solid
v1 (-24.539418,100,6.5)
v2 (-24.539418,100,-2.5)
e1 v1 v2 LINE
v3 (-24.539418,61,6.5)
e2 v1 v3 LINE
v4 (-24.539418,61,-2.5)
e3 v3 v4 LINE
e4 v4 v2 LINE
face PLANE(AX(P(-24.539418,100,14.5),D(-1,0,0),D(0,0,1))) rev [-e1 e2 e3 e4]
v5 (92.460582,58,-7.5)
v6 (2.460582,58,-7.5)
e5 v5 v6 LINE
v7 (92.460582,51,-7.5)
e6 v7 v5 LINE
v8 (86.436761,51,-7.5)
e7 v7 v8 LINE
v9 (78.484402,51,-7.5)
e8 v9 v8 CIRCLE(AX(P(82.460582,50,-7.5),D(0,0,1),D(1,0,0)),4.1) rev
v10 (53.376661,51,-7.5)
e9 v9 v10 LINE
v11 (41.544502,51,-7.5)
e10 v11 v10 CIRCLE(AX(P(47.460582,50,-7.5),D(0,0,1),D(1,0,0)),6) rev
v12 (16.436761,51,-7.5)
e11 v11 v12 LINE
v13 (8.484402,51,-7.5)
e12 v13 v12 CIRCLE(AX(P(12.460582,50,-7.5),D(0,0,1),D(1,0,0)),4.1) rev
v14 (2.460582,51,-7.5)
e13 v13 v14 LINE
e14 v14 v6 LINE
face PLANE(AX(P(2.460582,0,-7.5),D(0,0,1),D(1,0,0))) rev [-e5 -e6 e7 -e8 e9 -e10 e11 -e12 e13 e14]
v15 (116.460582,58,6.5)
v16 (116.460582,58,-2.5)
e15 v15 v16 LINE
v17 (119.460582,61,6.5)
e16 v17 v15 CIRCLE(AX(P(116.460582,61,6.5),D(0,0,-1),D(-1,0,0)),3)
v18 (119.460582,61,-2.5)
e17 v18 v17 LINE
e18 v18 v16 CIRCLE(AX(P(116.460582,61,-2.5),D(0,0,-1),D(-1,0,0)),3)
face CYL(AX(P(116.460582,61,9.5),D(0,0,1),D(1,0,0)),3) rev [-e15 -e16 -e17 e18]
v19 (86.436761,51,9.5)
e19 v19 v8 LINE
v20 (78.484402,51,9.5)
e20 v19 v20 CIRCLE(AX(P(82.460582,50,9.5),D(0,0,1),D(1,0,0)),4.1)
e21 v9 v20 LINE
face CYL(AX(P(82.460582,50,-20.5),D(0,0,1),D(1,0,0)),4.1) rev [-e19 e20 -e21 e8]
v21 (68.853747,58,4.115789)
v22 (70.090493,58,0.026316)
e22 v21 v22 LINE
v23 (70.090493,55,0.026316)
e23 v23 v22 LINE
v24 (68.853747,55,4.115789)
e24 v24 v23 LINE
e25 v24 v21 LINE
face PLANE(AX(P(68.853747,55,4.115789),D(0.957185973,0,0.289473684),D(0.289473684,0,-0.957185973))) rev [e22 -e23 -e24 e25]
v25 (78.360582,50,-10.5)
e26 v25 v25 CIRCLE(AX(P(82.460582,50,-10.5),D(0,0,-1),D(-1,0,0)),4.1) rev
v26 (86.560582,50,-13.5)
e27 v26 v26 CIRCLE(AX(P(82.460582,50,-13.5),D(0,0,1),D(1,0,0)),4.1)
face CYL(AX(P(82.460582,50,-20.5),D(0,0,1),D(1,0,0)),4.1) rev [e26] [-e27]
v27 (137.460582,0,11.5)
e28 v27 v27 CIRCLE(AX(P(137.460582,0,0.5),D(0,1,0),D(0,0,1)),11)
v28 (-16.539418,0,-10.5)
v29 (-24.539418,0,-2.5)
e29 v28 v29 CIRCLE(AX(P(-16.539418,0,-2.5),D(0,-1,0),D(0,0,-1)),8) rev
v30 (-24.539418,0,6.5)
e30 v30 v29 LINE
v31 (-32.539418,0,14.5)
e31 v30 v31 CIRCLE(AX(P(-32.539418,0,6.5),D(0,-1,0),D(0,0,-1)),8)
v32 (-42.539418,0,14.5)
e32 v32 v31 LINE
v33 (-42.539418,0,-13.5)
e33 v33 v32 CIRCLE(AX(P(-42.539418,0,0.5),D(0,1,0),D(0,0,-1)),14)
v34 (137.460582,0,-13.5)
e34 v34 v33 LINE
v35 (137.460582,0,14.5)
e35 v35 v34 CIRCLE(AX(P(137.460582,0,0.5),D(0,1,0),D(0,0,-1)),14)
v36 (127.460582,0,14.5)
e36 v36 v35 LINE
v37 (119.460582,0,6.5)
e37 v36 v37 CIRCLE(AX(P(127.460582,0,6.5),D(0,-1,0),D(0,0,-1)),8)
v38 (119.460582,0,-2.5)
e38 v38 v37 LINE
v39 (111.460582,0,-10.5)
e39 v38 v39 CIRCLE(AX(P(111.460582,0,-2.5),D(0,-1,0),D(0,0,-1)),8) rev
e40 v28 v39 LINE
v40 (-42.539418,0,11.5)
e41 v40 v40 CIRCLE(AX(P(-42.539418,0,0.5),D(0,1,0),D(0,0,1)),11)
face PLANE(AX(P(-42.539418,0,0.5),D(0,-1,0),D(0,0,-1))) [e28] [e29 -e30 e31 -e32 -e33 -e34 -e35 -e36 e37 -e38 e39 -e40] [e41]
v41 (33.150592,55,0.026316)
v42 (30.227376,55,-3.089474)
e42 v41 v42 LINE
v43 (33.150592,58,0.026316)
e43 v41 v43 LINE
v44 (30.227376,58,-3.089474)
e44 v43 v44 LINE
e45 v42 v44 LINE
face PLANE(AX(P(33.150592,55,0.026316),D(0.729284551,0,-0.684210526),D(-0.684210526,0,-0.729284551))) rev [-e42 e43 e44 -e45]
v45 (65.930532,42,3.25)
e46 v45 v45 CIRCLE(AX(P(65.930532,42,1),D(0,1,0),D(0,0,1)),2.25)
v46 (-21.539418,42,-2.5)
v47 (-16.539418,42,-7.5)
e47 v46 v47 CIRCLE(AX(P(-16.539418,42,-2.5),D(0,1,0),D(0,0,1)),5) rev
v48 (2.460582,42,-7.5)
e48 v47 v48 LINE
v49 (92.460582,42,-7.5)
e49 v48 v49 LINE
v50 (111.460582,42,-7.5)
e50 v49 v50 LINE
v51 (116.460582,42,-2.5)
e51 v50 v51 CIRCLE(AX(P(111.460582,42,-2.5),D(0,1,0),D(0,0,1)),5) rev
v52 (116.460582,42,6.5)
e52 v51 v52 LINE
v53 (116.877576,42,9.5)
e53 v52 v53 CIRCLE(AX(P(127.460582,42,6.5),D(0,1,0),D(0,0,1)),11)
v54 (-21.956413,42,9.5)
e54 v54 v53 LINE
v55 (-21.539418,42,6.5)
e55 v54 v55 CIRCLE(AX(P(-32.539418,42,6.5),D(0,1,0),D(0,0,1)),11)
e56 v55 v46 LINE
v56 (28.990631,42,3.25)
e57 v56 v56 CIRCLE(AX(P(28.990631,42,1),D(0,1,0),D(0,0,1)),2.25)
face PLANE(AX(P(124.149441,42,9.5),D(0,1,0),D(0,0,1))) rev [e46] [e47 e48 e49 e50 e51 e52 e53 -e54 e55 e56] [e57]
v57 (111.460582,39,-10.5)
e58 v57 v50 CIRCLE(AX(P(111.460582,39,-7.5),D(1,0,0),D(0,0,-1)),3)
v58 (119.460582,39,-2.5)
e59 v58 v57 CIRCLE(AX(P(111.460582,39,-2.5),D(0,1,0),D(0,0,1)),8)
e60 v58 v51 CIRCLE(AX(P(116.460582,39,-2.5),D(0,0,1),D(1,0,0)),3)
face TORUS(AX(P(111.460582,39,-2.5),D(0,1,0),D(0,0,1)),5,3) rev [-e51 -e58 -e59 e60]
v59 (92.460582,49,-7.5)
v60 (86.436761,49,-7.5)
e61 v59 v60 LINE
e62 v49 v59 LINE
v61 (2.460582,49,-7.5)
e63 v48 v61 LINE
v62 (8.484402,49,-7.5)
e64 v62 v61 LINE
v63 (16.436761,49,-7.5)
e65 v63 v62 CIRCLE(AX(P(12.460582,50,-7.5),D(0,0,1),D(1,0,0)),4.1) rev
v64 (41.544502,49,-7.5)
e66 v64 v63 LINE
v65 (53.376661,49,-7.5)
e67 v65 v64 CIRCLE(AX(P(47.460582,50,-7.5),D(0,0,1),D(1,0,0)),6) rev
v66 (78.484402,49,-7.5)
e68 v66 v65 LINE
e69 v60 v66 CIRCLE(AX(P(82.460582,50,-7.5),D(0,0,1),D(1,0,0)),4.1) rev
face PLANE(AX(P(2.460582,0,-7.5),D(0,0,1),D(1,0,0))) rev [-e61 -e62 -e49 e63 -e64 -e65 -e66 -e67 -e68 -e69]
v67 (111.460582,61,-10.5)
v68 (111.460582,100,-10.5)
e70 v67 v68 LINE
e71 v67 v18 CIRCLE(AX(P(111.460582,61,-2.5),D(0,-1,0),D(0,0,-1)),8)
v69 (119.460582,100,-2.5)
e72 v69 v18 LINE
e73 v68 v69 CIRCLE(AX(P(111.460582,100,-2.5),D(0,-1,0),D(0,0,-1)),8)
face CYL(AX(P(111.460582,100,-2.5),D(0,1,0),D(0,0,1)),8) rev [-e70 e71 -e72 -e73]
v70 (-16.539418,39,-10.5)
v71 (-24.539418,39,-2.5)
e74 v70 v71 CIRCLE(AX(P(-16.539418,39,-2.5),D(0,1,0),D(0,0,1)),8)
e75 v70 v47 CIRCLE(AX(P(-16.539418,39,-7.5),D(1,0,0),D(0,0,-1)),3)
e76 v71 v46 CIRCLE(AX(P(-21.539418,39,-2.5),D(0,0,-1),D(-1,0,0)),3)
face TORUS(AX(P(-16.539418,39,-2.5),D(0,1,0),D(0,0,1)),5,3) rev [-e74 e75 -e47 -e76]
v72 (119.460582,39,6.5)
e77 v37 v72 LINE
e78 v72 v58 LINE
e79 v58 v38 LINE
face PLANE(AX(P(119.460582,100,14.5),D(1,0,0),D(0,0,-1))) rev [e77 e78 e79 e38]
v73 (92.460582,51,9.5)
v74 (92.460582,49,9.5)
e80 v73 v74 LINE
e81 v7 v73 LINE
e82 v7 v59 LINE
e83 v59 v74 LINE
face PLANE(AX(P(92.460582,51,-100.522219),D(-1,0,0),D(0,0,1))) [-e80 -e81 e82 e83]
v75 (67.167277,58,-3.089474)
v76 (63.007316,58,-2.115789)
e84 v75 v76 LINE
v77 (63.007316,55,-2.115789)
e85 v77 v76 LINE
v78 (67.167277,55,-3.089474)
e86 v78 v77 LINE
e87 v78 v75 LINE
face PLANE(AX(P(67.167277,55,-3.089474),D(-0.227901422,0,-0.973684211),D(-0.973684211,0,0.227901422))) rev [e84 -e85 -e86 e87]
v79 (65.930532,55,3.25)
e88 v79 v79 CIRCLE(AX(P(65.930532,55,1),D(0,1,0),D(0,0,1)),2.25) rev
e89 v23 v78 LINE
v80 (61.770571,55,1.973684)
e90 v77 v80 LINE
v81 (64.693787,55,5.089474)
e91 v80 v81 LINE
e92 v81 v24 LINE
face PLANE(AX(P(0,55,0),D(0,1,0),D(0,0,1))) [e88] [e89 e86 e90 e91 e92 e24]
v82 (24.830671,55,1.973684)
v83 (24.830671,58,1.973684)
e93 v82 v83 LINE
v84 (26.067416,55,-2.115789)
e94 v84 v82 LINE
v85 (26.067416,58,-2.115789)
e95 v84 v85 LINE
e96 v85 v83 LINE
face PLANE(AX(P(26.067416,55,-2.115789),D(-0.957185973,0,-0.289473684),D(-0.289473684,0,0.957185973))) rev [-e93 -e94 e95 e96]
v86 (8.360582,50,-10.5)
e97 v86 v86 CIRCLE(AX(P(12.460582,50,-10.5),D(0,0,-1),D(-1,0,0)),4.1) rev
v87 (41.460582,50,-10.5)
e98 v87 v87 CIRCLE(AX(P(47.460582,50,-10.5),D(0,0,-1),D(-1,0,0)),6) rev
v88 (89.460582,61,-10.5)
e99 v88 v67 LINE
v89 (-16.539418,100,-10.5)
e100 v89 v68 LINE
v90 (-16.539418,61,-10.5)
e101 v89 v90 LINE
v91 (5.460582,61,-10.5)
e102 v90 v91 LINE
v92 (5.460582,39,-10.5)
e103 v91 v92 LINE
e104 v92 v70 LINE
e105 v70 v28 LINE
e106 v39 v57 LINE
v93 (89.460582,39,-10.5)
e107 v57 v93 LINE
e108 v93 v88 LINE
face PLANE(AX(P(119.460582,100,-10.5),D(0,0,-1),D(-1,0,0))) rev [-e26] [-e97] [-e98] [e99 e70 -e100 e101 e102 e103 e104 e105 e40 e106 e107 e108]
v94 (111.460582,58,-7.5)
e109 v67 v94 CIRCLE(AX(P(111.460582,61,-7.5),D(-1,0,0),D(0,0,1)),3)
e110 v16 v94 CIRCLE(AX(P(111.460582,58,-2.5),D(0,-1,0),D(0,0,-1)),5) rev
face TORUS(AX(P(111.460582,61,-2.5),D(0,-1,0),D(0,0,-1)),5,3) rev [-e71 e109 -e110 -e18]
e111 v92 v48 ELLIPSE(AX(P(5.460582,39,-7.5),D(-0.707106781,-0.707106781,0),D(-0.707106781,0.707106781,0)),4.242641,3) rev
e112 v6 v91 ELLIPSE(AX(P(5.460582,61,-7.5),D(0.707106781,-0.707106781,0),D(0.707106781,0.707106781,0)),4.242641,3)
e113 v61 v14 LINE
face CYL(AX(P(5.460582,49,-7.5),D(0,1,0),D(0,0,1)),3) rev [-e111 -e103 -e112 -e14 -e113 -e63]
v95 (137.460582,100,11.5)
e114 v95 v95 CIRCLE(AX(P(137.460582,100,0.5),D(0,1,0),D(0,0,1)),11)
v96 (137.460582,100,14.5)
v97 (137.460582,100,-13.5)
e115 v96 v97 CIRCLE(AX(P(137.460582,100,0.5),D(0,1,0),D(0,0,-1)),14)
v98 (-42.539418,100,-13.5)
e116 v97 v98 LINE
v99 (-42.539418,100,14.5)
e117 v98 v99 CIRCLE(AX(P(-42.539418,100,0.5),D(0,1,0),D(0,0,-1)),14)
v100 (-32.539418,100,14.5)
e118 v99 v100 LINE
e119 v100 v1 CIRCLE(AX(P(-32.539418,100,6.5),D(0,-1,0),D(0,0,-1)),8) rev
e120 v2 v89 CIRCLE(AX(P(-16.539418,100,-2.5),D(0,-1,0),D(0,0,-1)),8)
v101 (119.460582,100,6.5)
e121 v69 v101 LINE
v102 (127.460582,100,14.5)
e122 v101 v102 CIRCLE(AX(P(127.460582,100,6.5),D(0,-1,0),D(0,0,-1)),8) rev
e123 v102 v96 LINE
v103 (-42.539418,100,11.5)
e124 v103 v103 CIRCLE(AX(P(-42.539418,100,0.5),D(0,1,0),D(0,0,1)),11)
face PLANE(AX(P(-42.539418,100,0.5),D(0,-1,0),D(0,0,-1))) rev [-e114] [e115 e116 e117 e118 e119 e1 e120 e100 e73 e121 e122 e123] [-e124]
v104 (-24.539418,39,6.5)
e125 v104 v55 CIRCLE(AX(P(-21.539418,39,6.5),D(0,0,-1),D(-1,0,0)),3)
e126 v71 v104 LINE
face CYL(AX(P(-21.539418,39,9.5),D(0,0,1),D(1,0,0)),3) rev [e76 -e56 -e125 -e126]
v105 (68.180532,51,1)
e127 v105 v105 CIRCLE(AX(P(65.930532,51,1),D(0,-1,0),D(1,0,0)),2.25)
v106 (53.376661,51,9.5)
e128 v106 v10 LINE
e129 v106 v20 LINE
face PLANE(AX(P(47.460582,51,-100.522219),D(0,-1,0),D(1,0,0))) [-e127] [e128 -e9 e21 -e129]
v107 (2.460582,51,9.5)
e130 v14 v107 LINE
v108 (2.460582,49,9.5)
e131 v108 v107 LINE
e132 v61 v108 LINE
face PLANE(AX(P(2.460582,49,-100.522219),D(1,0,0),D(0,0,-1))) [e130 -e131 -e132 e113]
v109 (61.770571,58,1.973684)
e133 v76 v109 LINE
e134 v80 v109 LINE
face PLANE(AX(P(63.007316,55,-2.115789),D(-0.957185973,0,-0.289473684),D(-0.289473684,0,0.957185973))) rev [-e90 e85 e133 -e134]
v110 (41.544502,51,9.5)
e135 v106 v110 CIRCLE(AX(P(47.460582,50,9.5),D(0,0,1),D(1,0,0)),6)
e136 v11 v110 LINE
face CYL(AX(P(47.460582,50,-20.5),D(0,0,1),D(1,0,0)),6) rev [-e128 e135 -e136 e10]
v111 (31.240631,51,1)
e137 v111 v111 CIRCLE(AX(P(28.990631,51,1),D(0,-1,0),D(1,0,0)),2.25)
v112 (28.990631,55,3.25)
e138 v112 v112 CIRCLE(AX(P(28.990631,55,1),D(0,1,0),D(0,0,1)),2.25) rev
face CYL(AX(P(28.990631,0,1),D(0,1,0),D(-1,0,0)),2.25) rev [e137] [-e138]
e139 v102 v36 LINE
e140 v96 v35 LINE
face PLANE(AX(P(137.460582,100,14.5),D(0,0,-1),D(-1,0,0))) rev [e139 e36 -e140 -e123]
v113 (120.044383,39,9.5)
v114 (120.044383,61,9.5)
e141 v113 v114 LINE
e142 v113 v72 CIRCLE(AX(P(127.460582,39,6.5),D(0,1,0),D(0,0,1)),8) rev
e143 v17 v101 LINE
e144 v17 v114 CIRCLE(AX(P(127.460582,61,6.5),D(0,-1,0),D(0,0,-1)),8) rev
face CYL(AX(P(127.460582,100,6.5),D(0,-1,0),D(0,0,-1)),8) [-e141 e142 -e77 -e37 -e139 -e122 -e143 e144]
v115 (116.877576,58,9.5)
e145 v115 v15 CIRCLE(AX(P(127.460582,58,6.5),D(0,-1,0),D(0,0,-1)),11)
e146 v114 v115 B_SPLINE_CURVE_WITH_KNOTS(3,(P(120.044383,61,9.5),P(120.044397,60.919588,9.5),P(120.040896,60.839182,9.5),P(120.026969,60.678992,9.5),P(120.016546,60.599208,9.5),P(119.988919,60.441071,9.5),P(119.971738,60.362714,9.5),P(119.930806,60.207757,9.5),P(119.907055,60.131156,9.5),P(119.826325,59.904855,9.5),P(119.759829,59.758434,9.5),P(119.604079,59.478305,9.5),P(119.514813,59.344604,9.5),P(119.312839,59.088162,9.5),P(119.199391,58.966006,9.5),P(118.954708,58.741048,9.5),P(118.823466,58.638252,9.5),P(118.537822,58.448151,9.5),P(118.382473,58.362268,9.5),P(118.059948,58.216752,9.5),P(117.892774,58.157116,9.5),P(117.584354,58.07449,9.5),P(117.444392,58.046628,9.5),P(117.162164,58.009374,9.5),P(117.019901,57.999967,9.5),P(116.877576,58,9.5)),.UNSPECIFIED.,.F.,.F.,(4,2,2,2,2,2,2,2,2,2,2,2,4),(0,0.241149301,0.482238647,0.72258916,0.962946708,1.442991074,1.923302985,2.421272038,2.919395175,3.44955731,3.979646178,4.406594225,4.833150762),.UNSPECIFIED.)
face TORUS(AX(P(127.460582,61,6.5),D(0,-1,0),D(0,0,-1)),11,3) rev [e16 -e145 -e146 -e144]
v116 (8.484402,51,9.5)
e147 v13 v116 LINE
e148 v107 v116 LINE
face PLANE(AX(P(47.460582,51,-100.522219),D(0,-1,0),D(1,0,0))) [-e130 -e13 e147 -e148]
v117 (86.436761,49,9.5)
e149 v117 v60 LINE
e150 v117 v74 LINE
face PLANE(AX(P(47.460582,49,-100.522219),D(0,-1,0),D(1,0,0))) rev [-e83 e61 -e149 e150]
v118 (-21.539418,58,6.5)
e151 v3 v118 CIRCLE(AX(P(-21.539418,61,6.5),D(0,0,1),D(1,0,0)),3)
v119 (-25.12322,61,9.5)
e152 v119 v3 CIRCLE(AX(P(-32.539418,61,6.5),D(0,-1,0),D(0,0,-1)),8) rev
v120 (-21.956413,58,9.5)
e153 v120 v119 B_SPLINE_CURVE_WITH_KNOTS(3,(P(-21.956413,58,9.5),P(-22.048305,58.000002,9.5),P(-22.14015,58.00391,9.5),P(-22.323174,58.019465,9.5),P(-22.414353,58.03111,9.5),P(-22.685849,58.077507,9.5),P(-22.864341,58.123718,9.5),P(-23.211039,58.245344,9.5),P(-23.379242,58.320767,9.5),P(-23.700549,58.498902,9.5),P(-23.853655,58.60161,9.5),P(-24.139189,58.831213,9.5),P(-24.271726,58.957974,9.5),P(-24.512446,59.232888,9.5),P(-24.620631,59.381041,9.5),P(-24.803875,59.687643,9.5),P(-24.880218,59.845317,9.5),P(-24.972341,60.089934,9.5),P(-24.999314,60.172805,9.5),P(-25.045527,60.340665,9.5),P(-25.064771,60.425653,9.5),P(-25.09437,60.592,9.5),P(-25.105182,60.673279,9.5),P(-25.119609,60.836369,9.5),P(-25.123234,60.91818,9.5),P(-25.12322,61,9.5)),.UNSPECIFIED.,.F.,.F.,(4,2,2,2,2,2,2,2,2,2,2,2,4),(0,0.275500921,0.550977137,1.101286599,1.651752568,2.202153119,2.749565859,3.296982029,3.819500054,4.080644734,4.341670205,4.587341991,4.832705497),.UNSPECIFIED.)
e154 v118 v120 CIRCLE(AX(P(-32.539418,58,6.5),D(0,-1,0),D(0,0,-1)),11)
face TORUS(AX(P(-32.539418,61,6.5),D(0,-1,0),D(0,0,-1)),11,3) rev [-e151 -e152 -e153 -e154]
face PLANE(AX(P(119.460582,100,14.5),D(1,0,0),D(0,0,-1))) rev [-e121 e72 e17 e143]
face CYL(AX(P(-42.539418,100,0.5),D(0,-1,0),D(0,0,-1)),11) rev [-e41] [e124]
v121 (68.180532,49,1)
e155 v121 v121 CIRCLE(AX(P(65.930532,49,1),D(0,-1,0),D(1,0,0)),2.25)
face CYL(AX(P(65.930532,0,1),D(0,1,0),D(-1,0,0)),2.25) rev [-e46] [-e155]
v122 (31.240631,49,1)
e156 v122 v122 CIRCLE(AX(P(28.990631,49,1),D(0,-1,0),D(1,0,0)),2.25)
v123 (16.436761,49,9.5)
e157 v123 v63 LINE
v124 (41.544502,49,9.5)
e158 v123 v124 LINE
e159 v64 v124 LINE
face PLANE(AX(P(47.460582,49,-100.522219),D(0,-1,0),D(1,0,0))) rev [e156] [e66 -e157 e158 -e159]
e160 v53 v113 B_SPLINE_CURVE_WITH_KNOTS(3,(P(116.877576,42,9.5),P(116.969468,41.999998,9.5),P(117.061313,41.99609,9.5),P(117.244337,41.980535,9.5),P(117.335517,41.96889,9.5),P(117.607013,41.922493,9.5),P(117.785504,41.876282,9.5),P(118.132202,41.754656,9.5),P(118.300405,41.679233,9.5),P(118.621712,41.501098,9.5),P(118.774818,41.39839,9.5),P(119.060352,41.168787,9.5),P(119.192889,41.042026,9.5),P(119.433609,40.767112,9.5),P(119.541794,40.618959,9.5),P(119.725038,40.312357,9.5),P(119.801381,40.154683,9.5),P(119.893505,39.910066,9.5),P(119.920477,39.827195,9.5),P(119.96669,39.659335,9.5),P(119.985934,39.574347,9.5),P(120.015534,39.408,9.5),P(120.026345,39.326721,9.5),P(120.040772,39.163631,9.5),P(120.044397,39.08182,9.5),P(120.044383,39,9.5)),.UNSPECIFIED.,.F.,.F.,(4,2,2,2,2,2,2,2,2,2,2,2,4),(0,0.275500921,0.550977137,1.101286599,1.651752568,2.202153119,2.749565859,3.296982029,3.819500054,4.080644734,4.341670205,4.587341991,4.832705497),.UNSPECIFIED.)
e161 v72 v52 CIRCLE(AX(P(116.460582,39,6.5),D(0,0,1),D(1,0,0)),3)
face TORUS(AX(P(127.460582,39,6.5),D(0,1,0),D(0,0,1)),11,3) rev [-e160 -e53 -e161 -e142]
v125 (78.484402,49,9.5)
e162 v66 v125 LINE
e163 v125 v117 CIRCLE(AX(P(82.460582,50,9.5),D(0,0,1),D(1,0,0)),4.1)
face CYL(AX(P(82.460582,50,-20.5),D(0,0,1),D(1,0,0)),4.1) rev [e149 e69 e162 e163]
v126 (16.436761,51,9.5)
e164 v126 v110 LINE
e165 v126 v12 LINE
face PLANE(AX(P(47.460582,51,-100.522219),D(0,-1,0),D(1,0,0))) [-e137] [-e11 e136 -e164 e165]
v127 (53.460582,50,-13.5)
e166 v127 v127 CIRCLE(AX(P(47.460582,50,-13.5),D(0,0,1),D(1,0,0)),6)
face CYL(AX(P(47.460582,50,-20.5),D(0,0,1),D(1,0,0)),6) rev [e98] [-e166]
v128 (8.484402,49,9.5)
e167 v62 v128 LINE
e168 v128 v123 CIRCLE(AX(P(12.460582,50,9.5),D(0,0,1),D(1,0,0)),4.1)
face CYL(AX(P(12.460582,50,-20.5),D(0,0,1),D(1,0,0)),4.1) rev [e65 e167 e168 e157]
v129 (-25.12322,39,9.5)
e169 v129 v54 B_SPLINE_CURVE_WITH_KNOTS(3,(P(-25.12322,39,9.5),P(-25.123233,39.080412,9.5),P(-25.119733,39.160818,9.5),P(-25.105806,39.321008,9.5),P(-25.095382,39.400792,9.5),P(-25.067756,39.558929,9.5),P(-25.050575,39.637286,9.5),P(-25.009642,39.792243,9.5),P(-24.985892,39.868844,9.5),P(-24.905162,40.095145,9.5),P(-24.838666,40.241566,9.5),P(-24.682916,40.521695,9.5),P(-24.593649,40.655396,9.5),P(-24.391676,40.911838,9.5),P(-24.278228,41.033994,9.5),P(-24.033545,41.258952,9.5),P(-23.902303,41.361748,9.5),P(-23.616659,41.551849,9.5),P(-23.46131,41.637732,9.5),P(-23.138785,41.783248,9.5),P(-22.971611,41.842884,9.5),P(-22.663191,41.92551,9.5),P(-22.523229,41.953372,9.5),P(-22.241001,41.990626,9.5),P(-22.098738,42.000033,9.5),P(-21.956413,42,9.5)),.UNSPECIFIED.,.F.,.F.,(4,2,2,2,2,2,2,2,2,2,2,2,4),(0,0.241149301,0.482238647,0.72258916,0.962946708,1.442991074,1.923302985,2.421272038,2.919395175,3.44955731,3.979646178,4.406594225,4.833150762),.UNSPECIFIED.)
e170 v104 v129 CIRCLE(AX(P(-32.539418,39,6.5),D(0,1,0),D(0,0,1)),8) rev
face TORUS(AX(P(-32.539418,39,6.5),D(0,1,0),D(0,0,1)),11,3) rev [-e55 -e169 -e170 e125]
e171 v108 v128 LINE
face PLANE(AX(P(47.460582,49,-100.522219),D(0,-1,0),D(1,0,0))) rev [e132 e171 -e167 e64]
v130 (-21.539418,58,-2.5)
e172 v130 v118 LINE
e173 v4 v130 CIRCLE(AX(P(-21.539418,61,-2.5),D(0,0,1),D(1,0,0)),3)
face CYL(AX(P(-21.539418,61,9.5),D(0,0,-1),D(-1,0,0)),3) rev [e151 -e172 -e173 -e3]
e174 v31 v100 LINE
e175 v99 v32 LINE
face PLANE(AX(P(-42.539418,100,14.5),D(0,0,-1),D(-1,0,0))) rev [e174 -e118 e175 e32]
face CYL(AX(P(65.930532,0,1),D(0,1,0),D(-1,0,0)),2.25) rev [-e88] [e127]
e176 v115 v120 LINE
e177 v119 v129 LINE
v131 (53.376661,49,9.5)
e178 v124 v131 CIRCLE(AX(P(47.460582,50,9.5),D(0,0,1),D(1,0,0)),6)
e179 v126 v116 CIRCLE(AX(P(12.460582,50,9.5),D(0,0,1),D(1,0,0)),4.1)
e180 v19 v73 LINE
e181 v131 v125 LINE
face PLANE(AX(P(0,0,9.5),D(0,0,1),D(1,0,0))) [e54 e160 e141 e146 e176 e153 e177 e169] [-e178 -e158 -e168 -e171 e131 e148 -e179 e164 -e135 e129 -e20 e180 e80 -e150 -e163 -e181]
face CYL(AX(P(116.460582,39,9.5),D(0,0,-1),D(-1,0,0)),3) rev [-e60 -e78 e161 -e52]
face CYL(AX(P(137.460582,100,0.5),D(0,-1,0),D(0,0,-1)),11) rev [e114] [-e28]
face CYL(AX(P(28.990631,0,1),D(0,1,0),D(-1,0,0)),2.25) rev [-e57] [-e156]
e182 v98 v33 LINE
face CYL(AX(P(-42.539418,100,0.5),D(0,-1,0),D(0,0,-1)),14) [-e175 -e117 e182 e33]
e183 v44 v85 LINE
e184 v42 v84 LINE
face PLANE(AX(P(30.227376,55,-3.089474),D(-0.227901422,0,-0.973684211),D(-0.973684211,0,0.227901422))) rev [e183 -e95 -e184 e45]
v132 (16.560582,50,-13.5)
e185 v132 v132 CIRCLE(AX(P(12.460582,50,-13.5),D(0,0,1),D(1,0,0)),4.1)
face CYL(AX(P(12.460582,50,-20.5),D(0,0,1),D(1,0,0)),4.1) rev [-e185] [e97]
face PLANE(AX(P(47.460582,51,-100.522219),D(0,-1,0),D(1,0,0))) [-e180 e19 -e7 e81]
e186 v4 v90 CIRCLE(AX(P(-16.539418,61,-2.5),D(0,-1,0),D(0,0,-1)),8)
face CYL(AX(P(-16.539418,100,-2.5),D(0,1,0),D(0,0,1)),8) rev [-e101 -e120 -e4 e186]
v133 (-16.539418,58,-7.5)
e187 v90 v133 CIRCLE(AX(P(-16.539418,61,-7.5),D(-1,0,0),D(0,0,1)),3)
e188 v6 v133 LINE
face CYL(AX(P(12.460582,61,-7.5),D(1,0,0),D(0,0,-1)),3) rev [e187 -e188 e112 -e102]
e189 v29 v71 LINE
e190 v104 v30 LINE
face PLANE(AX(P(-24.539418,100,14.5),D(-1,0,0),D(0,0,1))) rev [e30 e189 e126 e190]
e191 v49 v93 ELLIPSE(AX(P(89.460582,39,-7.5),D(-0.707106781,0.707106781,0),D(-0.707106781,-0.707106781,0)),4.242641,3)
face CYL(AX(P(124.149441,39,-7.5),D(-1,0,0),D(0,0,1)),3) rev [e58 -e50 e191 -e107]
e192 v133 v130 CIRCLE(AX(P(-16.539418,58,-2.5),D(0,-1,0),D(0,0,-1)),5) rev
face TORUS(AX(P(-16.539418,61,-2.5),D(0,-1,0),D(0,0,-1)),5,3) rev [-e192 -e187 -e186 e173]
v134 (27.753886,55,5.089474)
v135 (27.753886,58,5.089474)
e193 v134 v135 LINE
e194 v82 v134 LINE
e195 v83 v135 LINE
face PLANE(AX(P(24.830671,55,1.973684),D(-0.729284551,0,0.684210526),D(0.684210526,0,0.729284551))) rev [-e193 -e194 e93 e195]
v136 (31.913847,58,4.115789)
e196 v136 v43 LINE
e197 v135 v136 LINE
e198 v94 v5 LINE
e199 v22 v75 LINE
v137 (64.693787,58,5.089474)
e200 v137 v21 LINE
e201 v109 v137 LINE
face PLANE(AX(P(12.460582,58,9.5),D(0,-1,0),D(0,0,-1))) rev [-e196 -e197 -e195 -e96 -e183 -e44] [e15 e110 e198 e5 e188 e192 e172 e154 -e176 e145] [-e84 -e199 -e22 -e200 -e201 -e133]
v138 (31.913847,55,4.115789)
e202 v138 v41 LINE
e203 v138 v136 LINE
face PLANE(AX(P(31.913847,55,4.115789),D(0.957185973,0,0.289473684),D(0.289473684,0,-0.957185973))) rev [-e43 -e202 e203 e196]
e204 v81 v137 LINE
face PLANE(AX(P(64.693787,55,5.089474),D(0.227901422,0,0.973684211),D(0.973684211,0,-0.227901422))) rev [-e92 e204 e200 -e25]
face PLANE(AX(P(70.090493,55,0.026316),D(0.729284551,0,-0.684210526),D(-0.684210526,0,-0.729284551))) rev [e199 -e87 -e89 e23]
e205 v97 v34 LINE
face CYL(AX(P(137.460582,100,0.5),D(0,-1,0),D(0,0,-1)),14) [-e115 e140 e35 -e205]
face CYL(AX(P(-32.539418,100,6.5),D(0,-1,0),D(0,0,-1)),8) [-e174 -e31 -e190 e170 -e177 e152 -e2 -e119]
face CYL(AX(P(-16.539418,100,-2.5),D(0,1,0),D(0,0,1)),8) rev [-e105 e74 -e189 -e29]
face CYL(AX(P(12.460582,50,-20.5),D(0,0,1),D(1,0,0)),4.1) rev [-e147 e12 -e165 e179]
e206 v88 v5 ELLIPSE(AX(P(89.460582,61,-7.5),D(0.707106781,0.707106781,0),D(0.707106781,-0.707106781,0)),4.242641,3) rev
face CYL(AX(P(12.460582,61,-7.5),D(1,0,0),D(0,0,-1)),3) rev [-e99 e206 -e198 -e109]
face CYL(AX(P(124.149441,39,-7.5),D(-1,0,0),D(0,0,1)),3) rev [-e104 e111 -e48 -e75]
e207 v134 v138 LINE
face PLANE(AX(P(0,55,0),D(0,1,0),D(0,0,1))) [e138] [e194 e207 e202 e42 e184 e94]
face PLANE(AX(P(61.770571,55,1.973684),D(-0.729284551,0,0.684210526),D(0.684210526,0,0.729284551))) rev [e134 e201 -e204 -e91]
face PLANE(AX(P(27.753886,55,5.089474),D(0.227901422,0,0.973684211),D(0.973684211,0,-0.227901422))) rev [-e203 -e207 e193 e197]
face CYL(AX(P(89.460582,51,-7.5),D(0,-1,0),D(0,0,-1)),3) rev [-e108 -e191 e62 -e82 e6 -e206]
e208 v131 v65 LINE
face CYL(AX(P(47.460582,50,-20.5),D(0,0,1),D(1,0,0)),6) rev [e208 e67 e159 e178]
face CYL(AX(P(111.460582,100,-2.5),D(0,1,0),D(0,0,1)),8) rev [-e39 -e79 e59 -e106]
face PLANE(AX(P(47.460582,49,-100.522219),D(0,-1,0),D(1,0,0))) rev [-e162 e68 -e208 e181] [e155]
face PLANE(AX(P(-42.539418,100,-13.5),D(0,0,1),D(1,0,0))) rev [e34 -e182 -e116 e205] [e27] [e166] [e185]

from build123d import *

# Parameters (mm, degrees)
SKETCH1_R                    = 11
BOSS_EXTRUDE1_DEPTH          = 100
FILLET1_R                    = 8
SKETCH2_R                    = 4.1
SKETCH2_R_2                  = 6
CUT_EXTRUDE1_DEPTH           = 10
BOSS_EXTRUDE2_START          = 20
SKETCH3_R                    = 4.1
SKETCH3_R_2                  = 6
BOSS_EXTRUDE2_DEPTH          = 20
FILLET2_R                    = 3
CUT_EXTRUDE_THIN1_DEPTH      = 183.94618817
CUT_EXTRUDE_THIN1_DEPTH_BACK = 20
CUT_EXTRUDE_THIN2_DEPTH      = 163.832913644
CUT_EXTRUDE_THIN2_DEPTH_BACK = 20
FILLET3_R                    = 3
CUT_EXTRUDE2_DEPTH           = 161.472919104
CUT_EXTRUDE2_DEPTH_BACK      = 161.472919104
SKETCH6_R                    = 2.25
CUT_EXTRUDE3_DEPTH           = 3


with BuildPart() as part:
    # Sketch1 → Boss-Extrude1 (new body)
    with BuildSketch(Plane(origin=(0, 0, 0), x_dir=(1, 0, 0), z_dir=(0, 1, 0))):
        with BuildLine():
            Line((137.460581558, -14.5), (119.460581558, -14.5))
            Line((119.460581558, -14.5), (119.460581558, 10.5))
            Line((119.460581558, 10.5), (-24.539418442, 10.5))
            Line((-24.539418442, 10.5), (-24.539418442, -14.5))
            Line((-24.539418442, -14.5), (-42.539418442, -14.5))
            ThreePointArc((-42.539418442, -14.5), (-56.539418442, -0.5), (-42.539418442, 13.5))
            Line((-42.539418442, 13.5), (137.460581558, 13.5))
            ThreePointArc((137.460581558, 13.5), (151.460581558, -0.5), (137.460581558, -14.5))
        make_face()
        with Locations(Location((-42.539418442, -0.5, 0), (0, 0, 270))):
            Circle(SKETCH1_R, mode=Mode.SUBTRACT)
        with Locations(Location((137.460581558, -0.5, 0), (0, 0, 270))):
            Circle(SKETCH1_R, mode=Mode.SUBTRACT)
    extrude(amount=BOSS_EXTRUDE1_DEPTH)

    # Fillet1
    fillet1_edges = [part.edges().sort_by_distance(p)[0] for p in [
        (119.460581558, 50, 14.5),
        (119.460581558, 50, -10.5),
        (-24.539418442, 50, -10.5),
        (-24.539418442, 50, 14.5),
    ]]
    fillet(fillet1_edges, radius=FILLET1_R)

    # Sketch2 → Cut-Extrude1 (cut)
    with BuildSketch(Plane.XY.offset(-10.5)):
        with Locations((12.460581558, 50)):
            Circle(SKETCH2_R)
        with Locations((82.460581558, 50)):
            Circle(SKETCH2_R)
        with Locations((47.460581558, 50)):
            Circle(SKETCH2_R_2)
    extrude(amount=-CUT_EXTRUDE1_DEPTH, mode=Mode.SUBTRACT)

    # Sketch3 → Boss-Extrude2 (add)
    with BuildSketch(Plane.XY.offset(-10.5).offset(BOSS_EXTRUDE2_START)):
        Polygon((12.460581558, 58), (82.460581558, 58), (124.149440998, 58), (124.149440998, 42), (82.460581558, 42), (12.460581558, 42), (-28.8662965, 42), (-28.8662965, 58), (-16.539418442, 58), align=None)
        with Locations((12.460581558, 50)):
            Circle(SKETCH3_R, mode=Mode.SUBTRACT)
        with Locations((82.460581558, 50)):
            Circle(SKETCH3_R, mode=Mode.SUBTRACT)
        with Locations((47.460581558, 50)):
            Circle(SKETCH3_R_2, mode=Mode.SUBTRACT)
    extrude(amount=-BOSS_EXTRUDE2_DEPTH)

    # Fillet2
    fillet2_edges = [part.edges().sort_by_distance(p)[0] for p in [
        (-24.686725022, 58, 8.0281381),
        (-24.686725022, 42, 8.0281381),
        (47.460581558, 42, -10.5),
        (117.117435807, 42, -8.156854249),
        (119.460581558, 42, 2),
        (-24.539418442, 42, 2),
        (-22.196272692, 42, -8.156854249),
        (119.607888138, 42, 8.0281381),
        (119.460581558, 58, 2),
        (117.117435807, 58, -8.156854249),
        (47.460581558, 58, -10.5),
        (-22.196272692, 58, -8.156854249),
        (-24.539418442, 58, 2),
        (119.607888138, 58, 8.0281381),
    ]]
    fillet(fillet2_edges, radius=FILLET2_R)

    # Sketch4 → Cut-Extrude-Thin1 (cut, two sides: drawn at the far end of the back side and taken through both)
    with BuildSketch(Plane.XY.offset(9.5).offset(-CUT_EXTRUDE_THIN1_DEPTH_BACK)):
        Polygon((92.460581558, 51), (47.460581558, 51), (2.460581558, 51), (2.460581558, 49), (47.460581558, 49), (92.460581558, 49), align=None)
    extrude(amount=CUT_EXTRUDE_THIN1_DEPTH + CUT_EXTRUDE_THIN1_DEPTH_BACK, mode=Mode.SUBTRACT)

    # Sketch5 → Cut-Extrude-Thin2 (cut, two sides: drawn at the far end of the back side and taken through both)
    with BuildSketch(Plane(origin=(0, 42, 0), x_dir=(-1, 0, 0), z_dir=(0, -1, 0)).offset(-CUT_EXTRUDE_THIN2_DEPTH_BACK)):
        Polygon((-2.460581558, 7.5), (-47.460581558, 7.5), (-92.460581558, 7.5), (-92.460581558, 10.5), (-47.460581558, 10.5), (-2.460581558, 10.5), align=None)
    extrude(amount=CUT_EXTRUDE_THIN2_DEPTH + CUT_EXTRUDE_THIN2_DEPTH_BACK, mode=Mode.SUBTRACT)

    # Fillet3
    fillet3_edges = [part.edges().sort_by_distance(p)[0] for p in [
        (2.460581558, 50, -10.5),
        (92.460581558, 50, -10.5),
    ]]
    fillet(fillet3_edges, radius=FILLET3_R - 0.0001)  # a hair under: the kernel refuses the full size

    # Sketch6 → Cut-Extrude2 (cut, two sides: drawn at the far end of the back side and taken through both)
    with BuildSketch(Plane(origin=(0, 49, 0), x_dir=(1, 0, 0), z_dir=(0, 1, 0)).offset(-CUT_EXTRUDE2_DEPTH_BACK)):
        with Locations(Location((28.990631201, -1, 0), (0, 0, 270))):
            Circle(SKETCH6_R)
        with Locations(Location((65.930531914, -1, 0), (0, 0, 270))):
            Circle(SKETCH6_R)
    extrude(amount=CUT_EXTRUDE2_DEPTH + CUT_EXTRUDE2_DEPTH_BACK, mode=Mode.SUBTRACT)

    # Sketch7 → Cut-Extrude3 (cut)
    with BuildSketch(Plane(origin=(0, 58, 0), x_dir=(1, 0, 0), z_dir=(0, 1, 0))):
        Polygon((33.150591825, -0.026315789), (30.227376252, 3.089473684), (26.067415628, 2.115789474), (24.830670578, -1.973684211), (27.753886151, -5.089473684), (31.913846775, -4.115789474), align=None)
        Polygon((70.090492538, -0.026315789), (67.167276964, 3.089473684), (63.007316341, 2.115789474), (61.77057129, -1.973684211), (64.693786864, -5.089473684), (68.853747488, -4.115789474), align=None)
    extrude(amount=-CUT_EXTRUDE3_DEPTH, mode=Mode.SUBTRACT)


solid = part.part
